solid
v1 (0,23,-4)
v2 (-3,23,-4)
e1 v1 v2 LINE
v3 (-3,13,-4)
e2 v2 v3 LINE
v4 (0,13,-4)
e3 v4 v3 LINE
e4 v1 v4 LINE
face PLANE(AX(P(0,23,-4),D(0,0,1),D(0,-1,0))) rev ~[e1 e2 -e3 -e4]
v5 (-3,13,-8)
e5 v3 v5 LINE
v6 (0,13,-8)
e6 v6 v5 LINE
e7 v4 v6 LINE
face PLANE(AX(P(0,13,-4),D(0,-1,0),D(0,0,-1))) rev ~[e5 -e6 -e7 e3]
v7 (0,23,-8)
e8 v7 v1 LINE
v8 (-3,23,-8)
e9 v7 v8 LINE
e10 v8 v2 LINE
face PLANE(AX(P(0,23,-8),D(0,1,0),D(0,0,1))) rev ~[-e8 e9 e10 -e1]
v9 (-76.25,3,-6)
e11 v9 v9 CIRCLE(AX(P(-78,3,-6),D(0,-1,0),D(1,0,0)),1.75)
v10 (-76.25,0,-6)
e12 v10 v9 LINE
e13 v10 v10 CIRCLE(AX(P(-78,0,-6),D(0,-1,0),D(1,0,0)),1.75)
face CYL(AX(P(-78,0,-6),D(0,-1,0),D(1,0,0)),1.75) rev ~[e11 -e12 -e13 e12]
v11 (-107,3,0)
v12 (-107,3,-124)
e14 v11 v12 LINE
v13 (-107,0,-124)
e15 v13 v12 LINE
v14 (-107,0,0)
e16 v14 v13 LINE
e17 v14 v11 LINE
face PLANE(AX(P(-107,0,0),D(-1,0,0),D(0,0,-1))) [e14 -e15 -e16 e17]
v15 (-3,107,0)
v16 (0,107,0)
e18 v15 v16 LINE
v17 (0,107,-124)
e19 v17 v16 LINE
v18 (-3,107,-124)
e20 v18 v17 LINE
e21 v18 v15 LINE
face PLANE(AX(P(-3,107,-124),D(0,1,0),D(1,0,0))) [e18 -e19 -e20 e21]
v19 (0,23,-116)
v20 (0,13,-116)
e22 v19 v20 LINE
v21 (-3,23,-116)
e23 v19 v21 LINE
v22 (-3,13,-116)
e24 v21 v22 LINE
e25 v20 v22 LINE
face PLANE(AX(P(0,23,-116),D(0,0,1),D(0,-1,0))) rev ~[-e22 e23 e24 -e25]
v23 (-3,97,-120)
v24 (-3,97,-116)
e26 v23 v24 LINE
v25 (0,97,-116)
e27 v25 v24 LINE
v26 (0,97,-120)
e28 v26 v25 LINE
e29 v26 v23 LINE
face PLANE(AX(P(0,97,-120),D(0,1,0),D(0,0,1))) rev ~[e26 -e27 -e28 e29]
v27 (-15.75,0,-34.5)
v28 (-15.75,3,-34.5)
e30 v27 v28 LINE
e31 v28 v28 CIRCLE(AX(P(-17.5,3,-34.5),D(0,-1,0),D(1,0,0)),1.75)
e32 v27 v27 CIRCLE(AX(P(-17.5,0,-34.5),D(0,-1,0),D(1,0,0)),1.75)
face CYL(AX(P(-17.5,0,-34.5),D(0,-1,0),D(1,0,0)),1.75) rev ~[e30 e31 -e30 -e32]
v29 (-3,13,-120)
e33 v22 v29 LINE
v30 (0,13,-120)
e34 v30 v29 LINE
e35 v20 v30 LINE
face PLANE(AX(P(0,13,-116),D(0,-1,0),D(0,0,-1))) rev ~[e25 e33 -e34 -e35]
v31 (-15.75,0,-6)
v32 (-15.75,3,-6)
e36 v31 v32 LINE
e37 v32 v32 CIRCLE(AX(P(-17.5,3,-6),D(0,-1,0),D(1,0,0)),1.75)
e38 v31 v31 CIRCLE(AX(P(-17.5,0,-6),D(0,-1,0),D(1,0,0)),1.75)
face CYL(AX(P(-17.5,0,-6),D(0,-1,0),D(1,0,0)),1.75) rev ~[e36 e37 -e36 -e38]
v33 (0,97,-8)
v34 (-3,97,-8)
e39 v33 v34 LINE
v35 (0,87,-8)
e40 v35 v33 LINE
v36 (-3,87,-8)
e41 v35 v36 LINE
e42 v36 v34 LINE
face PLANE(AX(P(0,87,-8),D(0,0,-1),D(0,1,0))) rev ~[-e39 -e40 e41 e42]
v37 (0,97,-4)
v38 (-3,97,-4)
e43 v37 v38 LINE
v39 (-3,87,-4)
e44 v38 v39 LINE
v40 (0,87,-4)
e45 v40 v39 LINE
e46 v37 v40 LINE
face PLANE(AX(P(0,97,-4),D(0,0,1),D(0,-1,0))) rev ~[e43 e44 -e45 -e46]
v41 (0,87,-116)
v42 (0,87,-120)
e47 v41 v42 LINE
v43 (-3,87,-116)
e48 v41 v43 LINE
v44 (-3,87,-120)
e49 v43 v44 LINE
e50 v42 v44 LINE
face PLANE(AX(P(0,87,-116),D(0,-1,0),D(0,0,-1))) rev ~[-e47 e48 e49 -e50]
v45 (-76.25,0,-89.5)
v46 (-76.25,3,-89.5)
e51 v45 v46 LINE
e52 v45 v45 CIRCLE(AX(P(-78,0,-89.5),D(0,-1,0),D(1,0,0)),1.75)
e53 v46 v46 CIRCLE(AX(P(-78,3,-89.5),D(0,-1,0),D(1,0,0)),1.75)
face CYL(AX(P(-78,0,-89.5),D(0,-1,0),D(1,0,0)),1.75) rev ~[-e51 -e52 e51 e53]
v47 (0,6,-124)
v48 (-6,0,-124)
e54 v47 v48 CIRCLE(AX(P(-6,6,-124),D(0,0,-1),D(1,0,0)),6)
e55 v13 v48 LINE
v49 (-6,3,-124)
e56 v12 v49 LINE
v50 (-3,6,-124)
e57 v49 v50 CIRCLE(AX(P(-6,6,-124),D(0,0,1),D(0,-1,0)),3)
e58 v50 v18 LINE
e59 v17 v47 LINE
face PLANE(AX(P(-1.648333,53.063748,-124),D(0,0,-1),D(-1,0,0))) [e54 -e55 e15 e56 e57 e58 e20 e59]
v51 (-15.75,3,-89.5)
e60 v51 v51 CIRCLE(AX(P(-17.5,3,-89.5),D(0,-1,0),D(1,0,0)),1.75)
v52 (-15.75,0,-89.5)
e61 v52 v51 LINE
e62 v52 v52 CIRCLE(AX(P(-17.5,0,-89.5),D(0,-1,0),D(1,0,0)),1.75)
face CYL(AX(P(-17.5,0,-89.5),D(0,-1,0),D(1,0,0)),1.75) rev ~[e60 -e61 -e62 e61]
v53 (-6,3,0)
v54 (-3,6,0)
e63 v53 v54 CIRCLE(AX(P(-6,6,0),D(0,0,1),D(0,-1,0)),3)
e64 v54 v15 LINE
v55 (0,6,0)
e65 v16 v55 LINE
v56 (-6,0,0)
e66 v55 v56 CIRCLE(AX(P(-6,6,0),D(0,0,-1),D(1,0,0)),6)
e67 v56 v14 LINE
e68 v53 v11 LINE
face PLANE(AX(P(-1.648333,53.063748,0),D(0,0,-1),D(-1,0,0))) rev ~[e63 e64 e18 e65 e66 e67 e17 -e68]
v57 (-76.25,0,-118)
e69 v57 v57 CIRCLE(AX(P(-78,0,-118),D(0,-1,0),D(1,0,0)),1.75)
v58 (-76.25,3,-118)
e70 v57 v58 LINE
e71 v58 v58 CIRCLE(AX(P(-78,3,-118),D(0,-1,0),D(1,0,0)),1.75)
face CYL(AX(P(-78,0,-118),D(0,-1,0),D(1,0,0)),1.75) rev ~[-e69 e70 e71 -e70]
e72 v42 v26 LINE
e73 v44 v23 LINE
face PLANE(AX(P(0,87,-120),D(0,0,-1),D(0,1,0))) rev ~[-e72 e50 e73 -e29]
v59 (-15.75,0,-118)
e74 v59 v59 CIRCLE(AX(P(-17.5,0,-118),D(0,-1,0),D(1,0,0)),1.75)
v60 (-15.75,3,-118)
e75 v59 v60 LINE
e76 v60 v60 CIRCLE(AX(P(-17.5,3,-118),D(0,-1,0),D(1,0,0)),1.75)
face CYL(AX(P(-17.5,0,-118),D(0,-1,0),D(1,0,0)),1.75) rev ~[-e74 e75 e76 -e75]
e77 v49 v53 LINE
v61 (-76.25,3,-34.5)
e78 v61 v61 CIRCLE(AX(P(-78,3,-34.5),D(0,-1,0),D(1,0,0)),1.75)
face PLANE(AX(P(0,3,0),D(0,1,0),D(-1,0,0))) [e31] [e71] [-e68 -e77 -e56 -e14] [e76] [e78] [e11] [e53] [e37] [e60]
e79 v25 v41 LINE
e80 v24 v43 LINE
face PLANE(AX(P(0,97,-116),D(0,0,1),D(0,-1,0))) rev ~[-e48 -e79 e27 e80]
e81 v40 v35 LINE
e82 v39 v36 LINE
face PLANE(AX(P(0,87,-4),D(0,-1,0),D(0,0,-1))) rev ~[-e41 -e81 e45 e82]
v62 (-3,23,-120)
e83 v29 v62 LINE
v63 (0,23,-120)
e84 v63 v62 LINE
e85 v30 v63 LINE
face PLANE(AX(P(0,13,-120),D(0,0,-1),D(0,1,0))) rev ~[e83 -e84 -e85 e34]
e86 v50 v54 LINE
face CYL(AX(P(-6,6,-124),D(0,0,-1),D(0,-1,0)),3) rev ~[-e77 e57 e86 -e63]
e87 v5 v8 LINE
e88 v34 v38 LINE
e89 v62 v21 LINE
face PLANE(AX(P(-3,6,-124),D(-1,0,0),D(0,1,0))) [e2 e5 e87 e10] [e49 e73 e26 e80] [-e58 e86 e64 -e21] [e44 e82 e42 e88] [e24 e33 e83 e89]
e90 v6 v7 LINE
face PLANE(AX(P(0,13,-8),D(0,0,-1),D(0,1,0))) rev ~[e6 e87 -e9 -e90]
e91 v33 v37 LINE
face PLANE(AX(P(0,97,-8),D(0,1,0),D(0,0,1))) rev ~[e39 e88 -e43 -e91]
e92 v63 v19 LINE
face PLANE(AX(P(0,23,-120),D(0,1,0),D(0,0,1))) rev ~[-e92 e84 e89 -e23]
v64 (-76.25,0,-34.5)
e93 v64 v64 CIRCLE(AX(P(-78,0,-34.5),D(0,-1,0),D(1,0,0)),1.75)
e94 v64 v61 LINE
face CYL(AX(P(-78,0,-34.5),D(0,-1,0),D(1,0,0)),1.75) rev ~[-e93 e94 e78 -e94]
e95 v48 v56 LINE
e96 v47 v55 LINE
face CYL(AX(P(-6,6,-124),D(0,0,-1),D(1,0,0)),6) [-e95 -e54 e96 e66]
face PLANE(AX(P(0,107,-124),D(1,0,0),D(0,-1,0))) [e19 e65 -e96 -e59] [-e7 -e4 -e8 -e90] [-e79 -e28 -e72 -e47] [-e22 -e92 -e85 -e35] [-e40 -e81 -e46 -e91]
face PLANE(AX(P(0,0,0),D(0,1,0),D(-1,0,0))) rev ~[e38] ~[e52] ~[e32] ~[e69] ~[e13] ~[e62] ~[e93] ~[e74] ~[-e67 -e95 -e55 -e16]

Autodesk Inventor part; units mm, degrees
ref_plane "YZ Plane" through (0, 0, 0) normal (1, 0, 0) x (0, 1, 0)
ref_plane "XZ Plane" through (0, 0, 0) normal (0, 1, 0) x (-1, 0, 0)
ref_plane "XY Plane" through (0, 0, 0) normal (0, 0, 1) x (1, 0, 0)
sketch "Sketch1" plane through (0, 0, 0) normal (0, 1, 0) x (-1, 0, 0)
  line L0 (0, 0) -> (107, 0)
  line L1 (107, 0) -> (107, -124)
  line L2 (107, -124) -> (0, -124)
  line L3 (0, -124) -> (0, 0)
  point P0 (53.5, -124)
  dimension "d0" = 107
  dimension "d1" = 124
extrude "Plate1" add sketch "Sketch1" along normal blind 3
sketch "Sketch2" plane through (-3, 0, -124) normal (1, 0, 0) x (0, 1, 0)
  line L0 (0, 124) -> (0, 0)
  line L1 (0, 0) -> (107, 0)
  line L2 (107, 0) -> (107, 124)
  line L3 (107, 124) -> (0, 124)
edge flange "Flange1" height 107 angle 90 thickness 3 bend radius 3 thickness toward (1, 0, 0) relief tear relief width 3 relief depth 1.5 edges at (0, 3, -62) wall of the first edge with corners at (-3, 0, 0) (-3, 0, -124) (-3, 107, -124) (-3, 107, 0)
bend "Bend1"
corner "Corner1"
sketch "Sketch6" plane through (0, 0, 0) normal (0, -1, 0) x (1, 0, 0)
  circle A0 centre (-78, -118) radius 1.75
  line L0 (-107, -124) -> (-107, 0) projected
  line L1 (-6, -124) -> (-107, -124) projected
  circle A1 centre (-78, -34.5) radius 1.75
  circle A2 centre (-17.5, -118) radius 1.75
  circle A3 centre (-17.5, -34.5) radius 1.75
  circle A4 centre (-78, -6) radius 1.75
  line L2 (-107, 0) -> (-6, 0) projected
  circle A5 centre (-78, -89.5) radius 1.75
  circle A6 centre (-17.5, -6) radius 1.75
  circle A7 centre (-17.5, -89.5) radius 1.75
  point P0 (0, 0)
  dimension "d79" = 3.5
  dimension "d80" = 29
  dimension "d81" = 6
  dimension "d84" = 83.5
  dimension "d87" = 60.5
  dimension "d113" = 3.5
  dimension "d114" = 6
  dimension "d115" = 29
  dimension "d118" = 83.5
  dimension "d121" = 60.5
extrude "Cut4" cut sketch "Sketch6" against normal blind 3
sketch "Sketch7" plane through (0, 107, 0) normal (1, 0, 0) x (0, 0, -1)
  line L0 (120, -84) -> (116, -84)
  line L1 (116, -84) -> (116, -94)
  line L2 (116, -94) -> (120, -94)
  line L3 (120, -94) -> (120, -84)
  line L4 (124, 0) -> (124, -101) projected
  line L5 (124, -107) -> (0, -107) projected
  line L6 (120, -10) -> (116, -10)
  line L7 (116, -10) -> (116, -20)
  line L8 (116, -20) -> (120, -20)
  line L9 (120, -20) -> (120, -10)
  line L10 (8, -84) -> (4, -84)
  line L11 (4, -84) -> (4, -94)
  line L12 (4, -94) -> (8, -94)
  line L13 (8, -94) -> (8, -84)
  line L14 (8, -10) -> (4, -10)
  line L15 (4, -10) -> (4, -20)
  line L16 (4, -20) -> (8, -20)
  line L17 (8, -20) -> (8, -10)
  point P0 (124, -27)
  point P1 (124, -33)
  point P2 (12, -101)
  point P3 (12, -107)
  point P4 (12, -27)
  point P5 (12, -33)
  dimension "d92" = 10
  dimension "d93" = 4
  dimension "d94" = 4
  dimension "d95" = 13
  dimension "d105" = 74
  dimension "d108" = 112
extrude "Extrusion1" cut sketch "Sketch7" against normal blind 3
equation "\"d114\" = d81"
equation "\"d115\" = d80"
equation "\"d118\" = d84"
equation "\"d121\" = d87"
equation "\"d90\" = Thickness"
equation "\"d108\" = d1 - d93 - 2 * d94"
equation "\"d24\" = Thickness"
equation "\"d25\" = BendReliefWidth"
equation "\"d26\" = BendReliefDepth"
equation "\"d27\" = MinimumRemnant"
equation "\"d28\" = TransitionRadius"
equation "\"d29\" = d0"
equation "\"d31\" = BendRadius"
equation "\"d32\" = CornerReliefSize"
equation "\"d33\" = GapSize"
equation "\"d34\" = JacobiRadiusSize"
equation "\"BendRadius\" = Thickness"
equation "\"BendReliefWidth\" = Thickness"
equation "\"BendReliefDepth\" = 0.5 * Thickness"
equation "\"CornerReliefSize\" = 4 * Thickness"
equation "\"MinimumRemnant\" = 2 * Thickness"
equation "\"TransitionRadius\" = BendRadius"
equation "\"JacobiRadiusSize\" = BendRadius"
equation "\"GapSize\" = Thickness"
equation "\"Thickness\" = 3"
properties part number "Face with CWT hole" material "Steel, Carbon"
